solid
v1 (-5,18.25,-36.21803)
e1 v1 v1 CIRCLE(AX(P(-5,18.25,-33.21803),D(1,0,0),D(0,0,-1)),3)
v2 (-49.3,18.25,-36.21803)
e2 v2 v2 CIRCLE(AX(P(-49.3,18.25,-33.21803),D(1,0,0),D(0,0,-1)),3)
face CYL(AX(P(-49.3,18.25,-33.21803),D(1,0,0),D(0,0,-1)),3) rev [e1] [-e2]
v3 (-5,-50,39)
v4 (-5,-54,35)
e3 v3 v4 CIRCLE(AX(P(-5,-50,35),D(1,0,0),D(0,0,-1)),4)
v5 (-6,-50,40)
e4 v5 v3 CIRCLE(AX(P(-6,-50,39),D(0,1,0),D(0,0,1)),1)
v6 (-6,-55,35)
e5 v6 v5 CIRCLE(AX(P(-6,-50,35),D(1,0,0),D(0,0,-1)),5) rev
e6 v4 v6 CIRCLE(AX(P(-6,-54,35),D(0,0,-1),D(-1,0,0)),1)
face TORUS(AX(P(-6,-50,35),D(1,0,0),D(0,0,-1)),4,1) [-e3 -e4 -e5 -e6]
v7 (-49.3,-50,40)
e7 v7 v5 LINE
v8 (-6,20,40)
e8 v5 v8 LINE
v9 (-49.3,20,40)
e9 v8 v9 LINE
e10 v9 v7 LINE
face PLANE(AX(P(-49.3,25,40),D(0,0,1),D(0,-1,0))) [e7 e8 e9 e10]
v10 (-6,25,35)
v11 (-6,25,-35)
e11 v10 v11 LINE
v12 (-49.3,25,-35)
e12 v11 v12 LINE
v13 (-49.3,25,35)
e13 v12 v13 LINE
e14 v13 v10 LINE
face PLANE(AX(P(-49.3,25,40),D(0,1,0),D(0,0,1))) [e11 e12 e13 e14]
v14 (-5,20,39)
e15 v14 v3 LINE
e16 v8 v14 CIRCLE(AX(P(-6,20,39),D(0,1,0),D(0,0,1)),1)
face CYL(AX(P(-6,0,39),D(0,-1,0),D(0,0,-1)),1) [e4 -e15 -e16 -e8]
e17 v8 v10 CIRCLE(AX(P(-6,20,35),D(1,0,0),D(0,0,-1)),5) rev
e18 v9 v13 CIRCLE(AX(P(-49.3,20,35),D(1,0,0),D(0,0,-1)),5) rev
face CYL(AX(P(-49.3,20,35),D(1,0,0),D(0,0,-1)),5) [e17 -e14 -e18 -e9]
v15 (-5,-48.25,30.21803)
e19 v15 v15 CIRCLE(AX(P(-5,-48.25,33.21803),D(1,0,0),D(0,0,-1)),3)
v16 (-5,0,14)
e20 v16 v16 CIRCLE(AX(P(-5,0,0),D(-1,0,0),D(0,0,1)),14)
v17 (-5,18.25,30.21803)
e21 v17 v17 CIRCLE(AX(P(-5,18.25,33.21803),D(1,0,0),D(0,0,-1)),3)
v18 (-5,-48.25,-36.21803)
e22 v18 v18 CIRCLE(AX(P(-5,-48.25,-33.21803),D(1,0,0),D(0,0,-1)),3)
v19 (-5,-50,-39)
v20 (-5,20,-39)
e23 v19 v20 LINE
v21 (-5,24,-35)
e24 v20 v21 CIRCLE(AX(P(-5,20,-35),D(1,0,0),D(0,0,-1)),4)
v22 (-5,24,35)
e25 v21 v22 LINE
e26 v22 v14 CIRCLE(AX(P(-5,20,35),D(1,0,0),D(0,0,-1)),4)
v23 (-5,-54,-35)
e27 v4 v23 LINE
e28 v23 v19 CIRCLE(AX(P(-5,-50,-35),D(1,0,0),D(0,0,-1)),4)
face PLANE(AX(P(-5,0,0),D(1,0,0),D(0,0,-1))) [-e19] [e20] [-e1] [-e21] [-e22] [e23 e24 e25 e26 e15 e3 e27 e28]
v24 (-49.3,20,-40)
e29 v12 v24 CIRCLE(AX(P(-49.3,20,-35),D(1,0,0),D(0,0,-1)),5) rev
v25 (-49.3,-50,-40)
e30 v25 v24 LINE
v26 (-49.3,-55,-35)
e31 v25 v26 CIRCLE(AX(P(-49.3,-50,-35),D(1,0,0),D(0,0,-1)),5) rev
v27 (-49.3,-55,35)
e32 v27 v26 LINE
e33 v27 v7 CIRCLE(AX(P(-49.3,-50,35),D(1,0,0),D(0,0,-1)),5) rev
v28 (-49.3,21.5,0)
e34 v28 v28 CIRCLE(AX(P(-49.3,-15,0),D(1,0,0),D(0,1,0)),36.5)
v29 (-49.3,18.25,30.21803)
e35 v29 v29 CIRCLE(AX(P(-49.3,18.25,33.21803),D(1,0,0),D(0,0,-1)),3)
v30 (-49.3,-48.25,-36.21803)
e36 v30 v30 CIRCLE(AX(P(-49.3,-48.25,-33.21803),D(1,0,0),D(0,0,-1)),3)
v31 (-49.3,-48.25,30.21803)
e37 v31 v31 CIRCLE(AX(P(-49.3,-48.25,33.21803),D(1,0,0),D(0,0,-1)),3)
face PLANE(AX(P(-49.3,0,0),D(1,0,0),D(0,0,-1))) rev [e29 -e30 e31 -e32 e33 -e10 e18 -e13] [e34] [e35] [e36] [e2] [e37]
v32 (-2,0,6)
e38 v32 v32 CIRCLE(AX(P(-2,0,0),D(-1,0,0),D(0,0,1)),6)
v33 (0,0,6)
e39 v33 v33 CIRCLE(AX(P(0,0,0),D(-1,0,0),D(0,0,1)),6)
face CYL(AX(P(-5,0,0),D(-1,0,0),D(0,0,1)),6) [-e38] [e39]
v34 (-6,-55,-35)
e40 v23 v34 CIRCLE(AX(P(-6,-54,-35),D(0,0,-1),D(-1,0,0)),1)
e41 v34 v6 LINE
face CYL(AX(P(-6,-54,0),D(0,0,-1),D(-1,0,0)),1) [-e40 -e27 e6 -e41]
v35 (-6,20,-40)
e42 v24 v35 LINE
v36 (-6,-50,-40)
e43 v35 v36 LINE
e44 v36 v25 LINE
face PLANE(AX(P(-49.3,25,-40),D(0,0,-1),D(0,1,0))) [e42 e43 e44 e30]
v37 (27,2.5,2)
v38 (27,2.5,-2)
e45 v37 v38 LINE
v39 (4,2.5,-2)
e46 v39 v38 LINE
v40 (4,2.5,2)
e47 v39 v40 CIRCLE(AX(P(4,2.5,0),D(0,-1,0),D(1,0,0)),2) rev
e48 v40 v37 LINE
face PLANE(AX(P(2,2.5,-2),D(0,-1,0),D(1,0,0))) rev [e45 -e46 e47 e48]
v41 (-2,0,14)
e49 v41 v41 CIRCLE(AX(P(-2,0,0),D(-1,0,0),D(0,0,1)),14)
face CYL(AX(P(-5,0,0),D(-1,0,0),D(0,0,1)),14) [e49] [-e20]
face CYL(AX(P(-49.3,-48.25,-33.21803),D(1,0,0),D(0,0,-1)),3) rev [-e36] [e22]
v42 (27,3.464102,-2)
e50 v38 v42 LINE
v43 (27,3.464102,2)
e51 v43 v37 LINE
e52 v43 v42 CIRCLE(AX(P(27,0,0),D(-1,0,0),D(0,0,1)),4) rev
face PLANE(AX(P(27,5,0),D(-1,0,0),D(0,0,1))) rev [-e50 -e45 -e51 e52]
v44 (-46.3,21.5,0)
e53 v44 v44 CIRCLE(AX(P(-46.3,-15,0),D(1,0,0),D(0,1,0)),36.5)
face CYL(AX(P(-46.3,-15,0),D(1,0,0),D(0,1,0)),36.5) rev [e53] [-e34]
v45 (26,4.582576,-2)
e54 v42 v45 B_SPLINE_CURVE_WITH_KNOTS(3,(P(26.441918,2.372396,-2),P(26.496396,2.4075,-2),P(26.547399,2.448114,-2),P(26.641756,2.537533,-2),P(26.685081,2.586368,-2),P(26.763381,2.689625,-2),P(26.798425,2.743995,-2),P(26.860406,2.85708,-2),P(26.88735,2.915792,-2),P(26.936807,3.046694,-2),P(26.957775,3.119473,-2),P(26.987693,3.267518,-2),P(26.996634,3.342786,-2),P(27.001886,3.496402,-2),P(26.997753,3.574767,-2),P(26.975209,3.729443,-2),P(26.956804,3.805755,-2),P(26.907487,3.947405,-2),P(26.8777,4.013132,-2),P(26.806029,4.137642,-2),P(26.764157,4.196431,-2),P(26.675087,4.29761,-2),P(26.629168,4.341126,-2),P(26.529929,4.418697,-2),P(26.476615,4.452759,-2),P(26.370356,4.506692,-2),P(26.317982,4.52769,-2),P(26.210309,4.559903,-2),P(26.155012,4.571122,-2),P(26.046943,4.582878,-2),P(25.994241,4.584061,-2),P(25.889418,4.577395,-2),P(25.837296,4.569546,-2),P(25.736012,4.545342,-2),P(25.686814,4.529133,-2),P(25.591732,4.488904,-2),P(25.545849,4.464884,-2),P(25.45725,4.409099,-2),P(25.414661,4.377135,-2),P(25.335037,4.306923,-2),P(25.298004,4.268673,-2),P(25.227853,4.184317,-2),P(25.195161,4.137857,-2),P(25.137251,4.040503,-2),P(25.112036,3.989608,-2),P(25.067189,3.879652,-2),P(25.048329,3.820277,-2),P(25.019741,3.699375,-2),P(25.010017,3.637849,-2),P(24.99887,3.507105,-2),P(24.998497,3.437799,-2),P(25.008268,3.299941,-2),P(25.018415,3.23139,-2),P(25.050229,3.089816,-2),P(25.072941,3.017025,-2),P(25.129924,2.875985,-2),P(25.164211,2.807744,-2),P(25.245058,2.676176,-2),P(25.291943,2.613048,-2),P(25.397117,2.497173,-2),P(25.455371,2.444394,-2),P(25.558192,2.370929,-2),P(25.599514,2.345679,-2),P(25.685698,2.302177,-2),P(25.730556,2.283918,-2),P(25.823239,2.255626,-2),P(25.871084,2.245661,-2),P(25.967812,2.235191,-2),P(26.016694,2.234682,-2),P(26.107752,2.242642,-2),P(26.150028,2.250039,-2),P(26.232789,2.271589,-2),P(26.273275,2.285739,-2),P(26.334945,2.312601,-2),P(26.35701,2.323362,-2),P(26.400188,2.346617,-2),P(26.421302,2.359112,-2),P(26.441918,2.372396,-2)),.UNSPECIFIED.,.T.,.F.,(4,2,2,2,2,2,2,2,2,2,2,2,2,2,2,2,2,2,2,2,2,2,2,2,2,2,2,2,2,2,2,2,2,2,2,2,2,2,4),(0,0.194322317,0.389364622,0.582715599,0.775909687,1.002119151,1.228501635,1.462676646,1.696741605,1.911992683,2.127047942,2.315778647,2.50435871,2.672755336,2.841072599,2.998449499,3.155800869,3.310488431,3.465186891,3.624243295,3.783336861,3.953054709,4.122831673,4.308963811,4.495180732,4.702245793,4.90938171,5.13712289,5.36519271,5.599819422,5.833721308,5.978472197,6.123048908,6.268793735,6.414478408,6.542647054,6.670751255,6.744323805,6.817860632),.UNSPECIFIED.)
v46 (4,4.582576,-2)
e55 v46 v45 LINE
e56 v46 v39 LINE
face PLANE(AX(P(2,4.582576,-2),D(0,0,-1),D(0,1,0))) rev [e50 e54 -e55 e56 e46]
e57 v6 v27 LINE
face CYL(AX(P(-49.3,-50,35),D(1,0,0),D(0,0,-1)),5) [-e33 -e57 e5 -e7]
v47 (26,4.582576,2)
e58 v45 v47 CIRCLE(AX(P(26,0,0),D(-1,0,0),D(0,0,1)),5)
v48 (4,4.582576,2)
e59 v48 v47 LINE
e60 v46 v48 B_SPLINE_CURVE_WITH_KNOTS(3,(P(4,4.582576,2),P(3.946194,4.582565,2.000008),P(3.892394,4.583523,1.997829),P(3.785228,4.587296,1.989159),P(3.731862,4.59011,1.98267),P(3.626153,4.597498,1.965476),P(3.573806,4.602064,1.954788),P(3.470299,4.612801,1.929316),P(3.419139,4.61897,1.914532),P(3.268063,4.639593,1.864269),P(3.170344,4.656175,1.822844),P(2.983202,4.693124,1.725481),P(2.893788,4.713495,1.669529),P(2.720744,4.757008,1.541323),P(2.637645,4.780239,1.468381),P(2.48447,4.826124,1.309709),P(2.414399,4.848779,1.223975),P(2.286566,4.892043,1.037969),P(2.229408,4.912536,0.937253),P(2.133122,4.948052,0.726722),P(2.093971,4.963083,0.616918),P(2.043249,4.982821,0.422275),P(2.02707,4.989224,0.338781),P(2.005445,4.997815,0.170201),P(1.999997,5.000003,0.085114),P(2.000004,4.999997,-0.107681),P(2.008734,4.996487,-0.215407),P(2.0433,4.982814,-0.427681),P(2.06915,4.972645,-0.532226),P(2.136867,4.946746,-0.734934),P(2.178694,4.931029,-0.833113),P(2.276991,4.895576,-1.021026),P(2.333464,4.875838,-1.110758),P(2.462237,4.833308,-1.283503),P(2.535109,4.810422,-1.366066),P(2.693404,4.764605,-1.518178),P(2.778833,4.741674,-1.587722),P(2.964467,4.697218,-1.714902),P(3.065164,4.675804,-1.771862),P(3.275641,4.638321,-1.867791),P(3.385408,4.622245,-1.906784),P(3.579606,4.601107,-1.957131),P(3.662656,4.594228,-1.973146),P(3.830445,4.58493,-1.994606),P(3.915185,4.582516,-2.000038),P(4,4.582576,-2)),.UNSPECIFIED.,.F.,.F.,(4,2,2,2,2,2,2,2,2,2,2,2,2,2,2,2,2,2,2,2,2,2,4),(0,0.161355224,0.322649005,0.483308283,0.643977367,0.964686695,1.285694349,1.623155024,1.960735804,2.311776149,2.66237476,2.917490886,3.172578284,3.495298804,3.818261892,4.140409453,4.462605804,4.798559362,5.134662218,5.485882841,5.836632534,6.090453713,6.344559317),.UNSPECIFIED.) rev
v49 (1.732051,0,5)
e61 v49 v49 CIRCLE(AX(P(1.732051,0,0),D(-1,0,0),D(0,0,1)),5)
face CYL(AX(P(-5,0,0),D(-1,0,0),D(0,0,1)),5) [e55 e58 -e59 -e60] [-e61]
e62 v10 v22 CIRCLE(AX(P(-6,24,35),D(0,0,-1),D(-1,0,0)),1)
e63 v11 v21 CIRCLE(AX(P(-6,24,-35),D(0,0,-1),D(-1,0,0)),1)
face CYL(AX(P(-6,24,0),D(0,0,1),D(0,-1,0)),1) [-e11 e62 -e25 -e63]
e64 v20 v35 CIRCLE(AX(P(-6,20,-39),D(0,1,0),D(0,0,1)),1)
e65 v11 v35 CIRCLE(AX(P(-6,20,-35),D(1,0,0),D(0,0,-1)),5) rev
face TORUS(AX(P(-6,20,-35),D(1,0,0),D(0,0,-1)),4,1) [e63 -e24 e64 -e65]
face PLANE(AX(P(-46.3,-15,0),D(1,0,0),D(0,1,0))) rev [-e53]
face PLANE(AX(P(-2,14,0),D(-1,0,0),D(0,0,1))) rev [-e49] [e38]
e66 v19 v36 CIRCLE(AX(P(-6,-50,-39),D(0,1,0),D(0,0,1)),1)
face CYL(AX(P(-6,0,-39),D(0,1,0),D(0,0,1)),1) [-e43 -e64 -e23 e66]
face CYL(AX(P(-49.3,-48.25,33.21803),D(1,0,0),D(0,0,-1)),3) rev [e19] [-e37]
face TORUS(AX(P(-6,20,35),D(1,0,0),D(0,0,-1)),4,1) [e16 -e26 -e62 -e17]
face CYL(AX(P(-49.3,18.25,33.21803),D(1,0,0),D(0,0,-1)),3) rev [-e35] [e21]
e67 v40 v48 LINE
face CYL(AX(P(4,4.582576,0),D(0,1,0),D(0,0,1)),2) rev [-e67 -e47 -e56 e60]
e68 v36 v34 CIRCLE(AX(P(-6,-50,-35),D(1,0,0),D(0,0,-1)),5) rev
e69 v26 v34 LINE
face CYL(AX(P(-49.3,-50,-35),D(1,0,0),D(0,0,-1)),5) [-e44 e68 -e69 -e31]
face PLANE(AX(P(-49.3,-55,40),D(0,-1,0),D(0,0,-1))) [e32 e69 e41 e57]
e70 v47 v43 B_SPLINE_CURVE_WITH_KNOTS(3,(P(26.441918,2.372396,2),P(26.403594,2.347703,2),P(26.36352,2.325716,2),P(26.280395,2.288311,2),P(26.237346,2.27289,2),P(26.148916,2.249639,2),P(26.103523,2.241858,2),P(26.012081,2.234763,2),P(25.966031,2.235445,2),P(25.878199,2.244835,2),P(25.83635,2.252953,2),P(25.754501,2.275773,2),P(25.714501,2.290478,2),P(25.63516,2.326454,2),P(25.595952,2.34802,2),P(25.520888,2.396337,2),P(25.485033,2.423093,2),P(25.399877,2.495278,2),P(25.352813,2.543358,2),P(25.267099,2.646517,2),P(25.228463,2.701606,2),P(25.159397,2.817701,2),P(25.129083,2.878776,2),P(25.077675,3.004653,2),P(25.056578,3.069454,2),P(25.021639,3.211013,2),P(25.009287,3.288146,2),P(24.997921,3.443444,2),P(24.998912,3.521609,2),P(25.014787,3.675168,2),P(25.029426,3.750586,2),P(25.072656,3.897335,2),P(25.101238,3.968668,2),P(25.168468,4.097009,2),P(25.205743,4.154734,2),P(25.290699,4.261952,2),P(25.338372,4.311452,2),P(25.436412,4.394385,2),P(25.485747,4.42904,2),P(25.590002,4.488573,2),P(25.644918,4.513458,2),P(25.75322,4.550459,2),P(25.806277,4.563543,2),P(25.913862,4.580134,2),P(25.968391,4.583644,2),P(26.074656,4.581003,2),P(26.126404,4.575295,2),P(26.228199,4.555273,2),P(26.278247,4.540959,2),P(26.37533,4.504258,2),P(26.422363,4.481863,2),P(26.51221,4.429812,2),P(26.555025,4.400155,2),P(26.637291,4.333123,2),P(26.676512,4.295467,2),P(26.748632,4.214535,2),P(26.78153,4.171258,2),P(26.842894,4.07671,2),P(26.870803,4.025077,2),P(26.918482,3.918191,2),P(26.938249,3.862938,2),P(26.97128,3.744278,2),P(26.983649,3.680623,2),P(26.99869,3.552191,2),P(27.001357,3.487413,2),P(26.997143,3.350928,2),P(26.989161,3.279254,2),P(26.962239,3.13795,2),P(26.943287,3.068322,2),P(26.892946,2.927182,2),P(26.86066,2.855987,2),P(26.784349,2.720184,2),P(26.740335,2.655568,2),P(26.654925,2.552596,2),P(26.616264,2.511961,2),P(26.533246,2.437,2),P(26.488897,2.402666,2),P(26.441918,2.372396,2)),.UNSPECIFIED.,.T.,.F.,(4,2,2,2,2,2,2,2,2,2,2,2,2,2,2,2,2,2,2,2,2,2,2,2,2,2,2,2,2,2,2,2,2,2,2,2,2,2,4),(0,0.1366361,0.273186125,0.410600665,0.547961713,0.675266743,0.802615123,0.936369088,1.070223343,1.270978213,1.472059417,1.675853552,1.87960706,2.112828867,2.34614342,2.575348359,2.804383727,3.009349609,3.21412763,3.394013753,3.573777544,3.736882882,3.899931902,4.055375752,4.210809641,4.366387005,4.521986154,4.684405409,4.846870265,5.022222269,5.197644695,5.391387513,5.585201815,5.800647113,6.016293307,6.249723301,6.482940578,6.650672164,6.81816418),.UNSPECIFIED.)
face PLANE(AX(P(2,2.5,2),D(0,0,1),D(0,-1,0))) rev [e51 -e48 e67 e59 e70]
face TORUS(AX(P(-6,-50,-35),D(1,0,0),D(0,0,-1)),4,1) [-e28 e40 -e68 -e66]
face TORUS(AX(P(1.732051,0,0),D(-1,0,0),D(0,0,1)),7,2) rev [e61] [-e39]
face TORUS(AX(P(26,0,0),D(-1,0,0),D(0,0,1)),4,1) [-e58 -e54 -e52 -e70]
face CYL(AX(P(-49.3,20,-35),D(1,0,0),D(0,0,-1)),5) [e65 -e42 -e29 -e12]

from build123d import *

# Parameters (mm, degrees)
SKETCH1_W           = 80
SKETCH1_H           = 80
BOSS_EXTRUDE1_DEPTH = 44.3
SKETCH2_R           = 3
CUT_EXTRUDE1_DEPTH  = 82.1633538
FILLET1_R           = 5
FILLET2_R           = 1
FILLET3_R           = 1
CUT_EXTRUDE2_DEPTH  = 25
FILLET4_R           = 2
SKETCH5_W           = 3
SKETCH5_H           = 36.5


with BuildPart() as part:
    # Sketch1 → Boss-Extrude1 (new body)
    with BuildSketch(Plane(origin=(-5, 0, 0), x_dir=(0, 0, -1), z_dir=(1, 0, 0))):
        with Locations((0, -15)):
            Rectangle(SKETCH1_W, SKETCH1_H)
    extrude(amount=-BOSS_EXTRUDE1_DEPTH)

    # Sketch2 → Cut-Extrude1 (cut, through all)
    with BuildSketch(Plane(origin=(-5, 0, 0), x_dir=(0, 0, -1), z_dir=(1, 0, 0))):
        with Locations((-33.218029743, 18.25)):
            Circle(SKETCH2_R)
        with Locations((33.218029743, 18.25)):
            Circle(SKETCH2_R)
        with Locations((33.218029743, -48.25)):
            Circle(SKETCH2_R)
        with Locations((-33.218029743, -48.25)):
            Circle(SKETCH2_R)
    extrude(amount=-CUT_EXTRUDE1_DEPTH, mode=Mode.SUBTRACT)

    # Fillet1
    fillet1_edges = [part.edges().sort_by_distance(p)[0] for p in [
        (-27.15, 25, 40),
        (-27.15, 25, -40),
        (-27.15, -55, -40),
        (-27.15, -55, 40),
    ]]
    fillet(fillet1_edges, radius=FILLET1_R)

    # Fillet2
    fillet2_edges = [part.edges().sort_by_distance(p)[0] for p in [
        (-5, -55, 0),
        (-5, -15, 40),
        (-5, -15, -40),
        (-5, 25, 0),
        (-5, 23.535533906, -38.535533906),
        (-5, 23.535533906, 38.535533906),
        (-5, -53.535533906, 38.535533906),
        (-5, -53.535533906, -38.535533906),
    ]]
    fillet(fillet2_edges, radius=FILLET2_R)

    # Sketch3 → Revolve1 (revolve)
    with BuildSketch(Plane.XY, mode=Mode.PRIVATE) as revolve1_sk:
        with BuildLine():
            Line((-5, 14), (-2, 14))
            Line((-2, 14), (-2, 6))
            Line((-2, 6), (0, 6))
            ThreePointArc((0, 6), (0.732050808, 5.267949192), (1.732050808, 5))
            Line((1.732050808, 5), (27, 5))
            Line((27, 5), (27, 0))
            Line((27, 0), (-5, 0))
            Line((-5, 0), (-5, 14))
        make_face()
    revolve(revolve1_sk.sketch.rotate(Axis((-5, 0, 0), (1, 0, 0)), 90), axis=Axis((-5, 0, 0), (1, 0, 0)))

    # Fillet3
    fillet3_edges = [part.edges().sort_by_distance(p)[0] for p in [
        (27, 0, -5),
    ]]
    fillet(fillet3_edges, radius=FILLET3_R)

    # Sketch4 → Cut-Extrude2 (cut)
    with BuildSketch(Plane(origin=(27, 0, 0), x_dir=(0, 0, -1), z_dir=(1, 0, 0))):
        with BuildLine():
            Line((2, 4.582575695), (2, 2.5))
            Line((2, 2.5), (-2, 2.5))
            Line((-2, 2.5), (-2, 4.582575695))
            ThreePointArc((-2, 4.582575695), (0, 5), (2, 4.582575695))
        make_face()
    extrude(amount=-CUT_EXTRUDE2_DEPTH, mode=Mode.SUBTRACT)

    # Fillet4
    fillet4_edges = [part.edges().sort_by_distance(p)[0] for p in [
        (2, 3.541287847, -2),
        (2, 3.541287847, 2),
    ]]
    fillet(fillet4_edges, radius=FILLET4_R - 0.0001)  # a hair under: the kernel refuses the full size

    # Sketch5 → Cut-Revolve1 (revolve, cut)
    with BuildSketch(Plane.XY):
        with Locations((-47.8, 3.25)):
            Rectangle(SKETCH5_W, SKETCH5_H)
    revolve(axis=Axis((-46.3, -15, 0), (-1, 0, 0)), mode=Mode.SUBTRACT)


solid = part.part
